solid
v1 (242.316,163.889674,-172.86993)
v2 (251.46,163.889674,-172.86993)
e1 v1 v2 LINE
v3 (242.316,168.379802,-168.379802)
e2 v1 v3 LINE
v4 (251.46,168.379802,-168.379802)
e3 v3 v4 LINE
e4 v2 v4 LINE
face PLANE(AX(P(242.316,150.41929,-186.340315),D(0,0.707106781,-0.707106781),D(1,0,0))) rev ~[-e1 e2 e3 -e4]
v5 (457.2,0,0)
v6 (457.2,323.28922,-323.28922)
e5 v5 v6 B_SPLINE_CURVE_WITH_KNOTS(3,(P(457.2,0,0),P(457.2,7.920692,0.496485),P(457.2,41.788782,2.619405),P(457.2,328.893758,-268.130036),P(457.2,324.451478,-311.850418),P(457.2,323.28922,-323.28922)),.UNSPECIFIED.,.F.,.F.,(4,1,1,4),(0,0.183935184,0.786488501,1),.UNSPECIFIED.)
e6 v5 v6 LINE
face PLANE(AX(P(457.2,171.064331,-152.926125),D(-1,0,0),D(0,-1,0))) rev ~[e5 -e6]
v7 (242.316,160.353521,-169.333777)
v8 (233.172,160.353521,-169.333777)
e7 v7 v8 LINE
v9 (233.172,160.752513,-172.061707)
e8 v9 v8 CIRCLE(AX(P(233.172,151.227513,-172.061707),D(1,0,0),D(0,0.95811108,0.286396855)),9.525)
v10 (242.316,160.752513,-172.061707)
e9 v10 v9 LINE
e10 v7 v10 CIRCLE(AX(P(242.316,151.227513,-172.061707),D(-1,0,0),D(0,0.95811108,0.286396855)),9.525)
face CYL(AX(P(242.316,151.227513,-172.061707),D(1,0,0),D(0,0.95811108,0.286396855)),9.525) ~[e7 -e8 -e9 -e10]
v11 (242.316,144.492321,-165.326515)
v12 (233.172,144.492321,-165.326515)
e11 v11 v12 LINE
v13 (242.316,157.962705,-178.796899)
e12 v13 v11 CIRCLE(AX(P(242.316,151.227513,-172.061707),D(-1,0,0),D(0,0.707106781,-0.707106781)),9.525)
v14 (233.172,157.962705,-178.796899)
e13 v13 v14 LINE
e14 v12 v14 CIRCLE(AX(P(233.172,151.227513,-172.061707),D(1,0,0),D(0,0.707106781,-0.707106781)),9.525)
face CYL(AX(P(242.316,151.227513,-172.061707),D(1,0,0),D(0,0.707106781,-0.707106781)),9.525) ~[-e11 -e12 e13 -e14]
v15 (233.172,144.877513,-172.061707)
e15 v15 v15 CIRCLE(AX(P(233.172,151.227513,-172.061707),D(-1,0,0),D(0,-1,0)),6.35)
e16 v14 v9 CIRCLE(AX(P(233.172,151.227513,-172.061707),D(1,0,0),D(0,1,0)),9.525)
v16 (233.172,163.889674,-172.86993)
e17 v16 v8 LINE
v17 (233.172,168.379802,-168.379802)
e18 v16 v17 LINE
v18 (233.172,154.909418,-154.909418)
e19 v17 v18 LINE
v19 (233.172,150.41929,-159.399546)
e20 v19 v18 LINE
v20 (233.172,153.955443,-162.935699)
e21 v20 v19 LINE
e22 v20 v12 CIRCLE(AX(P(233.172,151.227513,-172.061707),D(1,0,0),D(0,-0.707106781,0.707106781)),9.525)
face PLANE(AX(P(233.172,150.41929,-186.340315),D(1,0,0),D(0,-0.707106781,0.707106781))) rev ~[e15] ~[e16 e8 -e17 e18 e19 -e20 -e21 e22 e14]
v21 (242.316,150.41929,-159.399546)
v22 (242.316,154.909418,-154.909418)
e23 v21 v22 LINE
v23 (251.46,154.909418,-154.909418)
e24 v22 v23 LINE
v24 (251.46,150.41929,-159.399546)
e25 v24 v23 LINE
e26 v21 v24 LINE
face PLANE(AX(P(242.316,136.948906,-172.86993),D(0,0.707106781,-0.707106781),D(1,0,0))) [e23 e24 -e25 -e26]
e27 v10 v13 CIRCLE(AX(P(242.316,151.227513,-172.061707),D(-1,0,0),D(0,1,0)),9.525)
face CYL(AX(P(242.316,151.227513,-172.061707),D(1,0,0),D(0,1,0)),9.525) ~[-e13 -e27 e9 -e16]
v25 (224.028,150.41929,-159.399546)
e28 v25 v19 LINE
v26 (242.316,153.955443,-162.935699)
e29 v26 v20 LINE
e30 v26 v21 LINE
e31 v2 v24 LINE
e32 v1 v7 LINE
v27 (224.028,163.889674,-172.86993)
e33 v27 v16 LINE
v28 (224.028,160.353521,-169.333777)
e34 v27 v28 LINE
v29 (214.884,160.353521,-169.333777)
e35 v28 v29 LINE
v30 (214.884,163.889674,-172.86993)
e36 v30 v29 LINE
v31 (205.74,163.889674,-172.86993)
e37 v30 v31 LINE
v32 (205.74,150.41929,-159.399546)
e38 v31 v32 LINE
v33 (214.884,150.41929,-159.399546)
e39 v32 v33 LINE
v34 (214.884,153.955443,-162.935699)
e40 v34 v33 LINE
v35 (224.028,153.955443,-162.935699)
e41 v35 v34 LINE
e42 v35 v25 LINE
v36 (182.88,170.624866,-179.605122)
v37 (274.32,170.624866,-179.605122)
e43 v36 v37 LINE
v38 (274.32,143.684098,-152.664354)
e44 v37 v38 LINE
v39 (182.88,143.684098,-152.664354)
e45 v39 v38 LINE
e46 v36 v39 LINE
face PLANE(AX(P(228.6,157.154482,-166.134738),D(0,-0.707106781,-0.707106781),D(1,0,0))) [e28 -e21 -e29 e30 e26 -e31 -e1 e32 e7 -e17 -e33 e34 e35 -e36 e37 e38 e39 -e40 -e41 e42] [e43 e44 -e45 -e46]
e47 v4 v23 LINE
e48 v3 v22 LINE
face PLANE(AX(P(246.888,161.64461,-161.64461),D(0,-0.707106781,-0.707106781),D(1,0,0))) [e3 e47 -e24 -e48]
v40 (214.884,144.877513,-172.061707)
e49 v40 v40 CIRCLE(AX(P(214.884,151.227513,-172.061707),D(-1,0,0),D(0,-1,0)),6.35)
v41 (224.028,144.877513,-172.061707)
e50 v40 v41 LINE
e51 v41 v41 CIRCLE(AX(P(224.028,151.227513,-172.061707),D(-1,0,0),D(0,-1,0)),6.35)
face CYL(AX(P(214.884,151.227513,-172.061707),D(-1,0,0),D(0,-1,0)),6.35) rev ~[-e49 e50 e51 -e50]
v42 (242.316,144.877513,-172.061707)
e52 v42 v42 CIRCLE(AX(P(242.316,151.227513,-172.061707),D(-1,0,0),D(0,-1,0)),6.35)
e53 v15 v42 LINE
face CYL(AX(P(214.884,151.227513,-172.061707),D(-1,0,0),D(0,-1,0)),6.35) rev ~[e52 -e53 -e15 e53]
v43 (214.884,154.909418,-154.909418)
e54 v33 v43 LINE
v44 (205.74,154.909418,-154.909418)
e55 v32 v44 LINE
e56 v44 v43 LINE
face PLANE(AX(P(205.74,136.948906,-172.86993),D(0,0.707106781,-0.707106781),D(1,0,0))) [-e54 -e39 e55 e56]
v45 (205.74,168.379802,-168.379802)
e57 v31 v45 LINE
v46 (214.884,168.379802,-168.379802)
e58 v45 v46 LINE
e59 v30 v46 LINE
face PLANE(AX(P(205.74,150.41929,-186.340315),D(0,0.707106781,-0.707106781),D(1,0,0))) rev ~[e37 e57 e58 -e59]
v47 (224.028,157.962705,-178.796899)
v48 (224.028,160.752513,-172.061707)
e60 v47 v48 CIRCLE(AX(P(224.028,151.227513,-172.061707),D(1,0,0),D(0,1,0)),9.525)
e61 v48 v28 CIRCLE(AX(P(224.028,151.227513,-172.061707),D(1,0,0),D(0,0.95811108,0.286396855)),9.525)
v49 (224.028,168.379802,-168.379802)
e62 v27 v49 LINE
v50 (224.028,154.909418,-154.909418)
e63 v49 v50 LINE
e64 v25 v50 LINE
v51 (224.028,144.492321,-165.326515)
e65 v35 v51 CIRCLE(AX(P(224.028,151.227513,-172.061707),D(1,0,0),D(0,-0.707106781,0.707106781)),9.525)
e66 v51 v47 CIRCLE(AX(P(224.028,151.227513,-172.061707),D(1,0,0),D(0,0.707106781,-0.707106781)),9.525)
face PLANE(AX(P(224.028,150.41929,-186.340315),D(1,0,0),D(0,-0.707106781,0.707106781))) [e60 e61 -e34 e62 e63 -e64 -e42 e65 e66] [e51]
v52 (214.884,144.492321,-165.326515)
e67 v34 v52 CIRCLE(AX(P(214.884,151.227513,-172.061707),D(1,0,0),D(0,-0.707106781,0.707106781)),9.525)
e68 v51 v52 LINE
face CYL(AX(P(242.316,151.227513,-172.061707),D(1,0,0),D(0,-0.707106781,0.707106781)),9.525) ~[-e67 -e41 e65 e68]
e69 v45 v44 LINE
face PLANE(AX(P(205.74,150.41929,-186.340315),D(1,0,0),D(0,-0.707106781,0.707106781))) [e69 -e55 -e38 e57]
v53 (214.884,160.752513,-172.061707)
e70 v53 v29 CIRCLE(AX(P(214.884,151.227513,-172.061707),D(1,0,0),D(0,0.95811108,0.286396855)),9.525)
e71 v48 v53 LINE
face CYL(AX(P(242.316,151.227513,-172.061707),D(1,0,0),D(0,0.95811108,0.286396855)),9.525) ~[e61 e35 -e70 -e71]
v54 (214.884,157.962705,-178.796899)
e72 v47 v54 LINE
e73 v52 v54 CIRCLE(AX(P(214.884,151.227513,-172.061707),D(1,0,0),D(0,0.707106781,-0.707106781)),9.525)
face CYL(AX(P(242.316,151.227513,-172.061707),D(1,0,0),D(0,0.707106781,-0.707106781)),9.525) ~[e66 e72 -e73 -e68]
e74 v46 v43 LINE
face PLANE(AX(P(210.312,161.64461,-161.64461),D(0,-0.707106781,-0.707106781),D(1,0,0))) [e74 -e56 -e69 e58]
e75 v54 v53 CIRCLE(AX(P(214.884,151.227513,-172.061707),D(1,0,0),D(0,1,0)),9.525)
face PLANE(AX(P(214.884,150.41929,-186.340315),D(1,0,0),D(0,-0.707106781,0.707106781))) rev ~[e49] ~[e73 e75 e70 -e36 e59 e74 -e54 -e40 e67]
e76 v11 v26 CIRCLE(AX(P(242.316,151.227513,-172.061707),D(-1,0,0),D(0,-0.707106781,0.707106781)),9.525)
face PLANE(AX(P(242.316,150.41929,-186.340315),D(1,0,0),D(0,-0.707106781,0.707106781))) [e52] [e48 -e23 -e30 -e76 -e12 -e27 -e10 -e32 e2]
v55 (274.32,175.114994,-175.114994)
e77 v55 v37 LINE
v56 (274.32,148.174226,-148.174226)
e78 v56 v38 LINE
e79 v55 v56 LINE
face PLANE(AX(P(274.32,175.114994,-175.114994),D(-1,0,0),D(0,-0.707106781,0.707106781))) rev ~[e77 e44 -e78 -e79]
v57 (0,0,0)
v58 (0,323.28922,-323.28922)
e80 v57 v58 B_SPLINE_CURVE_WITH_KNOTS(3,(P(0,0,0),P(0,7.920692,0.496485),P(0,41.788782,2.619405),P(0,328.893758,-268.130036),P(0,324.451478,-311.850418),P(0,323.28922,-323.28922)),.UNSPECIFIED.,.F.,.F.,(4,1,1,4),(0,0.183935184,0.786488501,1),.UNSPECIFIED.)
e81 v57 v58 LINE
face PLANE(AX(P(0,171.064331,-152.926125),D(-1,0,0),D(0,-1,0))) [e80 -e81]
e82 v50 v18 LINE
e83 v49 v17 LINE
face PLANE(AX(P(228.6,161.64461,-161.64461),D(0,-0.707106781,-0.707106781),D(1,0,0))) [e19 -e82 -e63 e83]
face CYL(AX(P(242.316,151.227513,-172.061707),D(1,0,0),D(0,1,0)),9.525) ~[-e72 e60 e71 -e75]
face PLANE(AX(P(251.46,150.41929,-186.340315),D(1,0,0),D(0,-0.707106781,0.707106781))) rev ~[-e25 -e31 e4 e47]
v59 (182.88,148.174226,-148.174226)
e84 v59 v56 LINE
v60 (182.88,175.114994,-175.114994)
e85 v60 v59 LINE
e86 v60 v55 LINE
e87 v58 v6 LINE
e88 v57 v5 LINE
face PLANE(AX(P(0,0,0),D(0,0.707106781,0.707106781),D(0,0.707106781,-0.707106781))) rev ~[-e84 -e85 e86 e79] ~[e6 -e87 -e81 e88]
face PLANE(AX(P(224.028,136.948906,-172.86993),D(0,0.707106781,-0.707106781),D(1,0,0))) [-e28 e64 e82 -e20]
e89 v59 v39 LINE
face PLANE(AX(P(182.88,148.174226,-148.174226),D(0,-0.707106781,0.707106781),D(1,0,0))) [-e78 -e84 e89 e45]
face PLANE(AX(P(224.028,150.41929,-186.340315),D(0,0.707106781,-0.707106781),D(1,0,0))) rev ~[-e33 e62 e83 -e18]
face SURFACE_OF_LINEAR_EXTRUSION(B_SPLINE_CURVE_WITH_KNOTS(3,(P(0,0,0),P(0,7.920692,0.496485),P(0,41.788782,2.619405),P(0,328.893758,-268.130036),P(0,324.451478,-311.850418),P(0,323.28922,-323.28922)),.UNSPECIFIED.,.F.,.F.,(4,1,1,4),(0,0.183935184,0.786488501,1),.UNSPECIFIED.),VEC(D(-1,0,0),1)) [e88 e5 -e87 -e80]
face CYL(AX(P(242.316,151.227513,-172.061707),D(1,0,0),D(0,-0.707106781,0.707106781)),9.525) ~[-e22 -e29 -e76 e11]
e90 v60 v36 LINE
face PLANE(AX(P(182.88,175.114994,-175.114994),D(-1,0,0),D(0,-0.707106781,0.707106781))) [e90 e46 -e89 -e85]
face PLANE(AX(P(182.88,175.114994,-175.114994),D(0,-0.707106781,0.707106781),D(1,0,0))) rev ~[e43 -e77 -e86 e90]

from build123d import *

# Parameters (mm, degrees)
F1_DEPTH  = 457.2
F2_W      = 91.44
F2_H      = 38.1
F3_DEPTH  = 6.35
F4_W      = 45.72
F4_H      = 19.05
F5_DEPTH  = 19.05
F6_W      = 9.144
F6_H      = 19.05
F7_DEPTH  = 25.4
F9_DEPTH  = 27.94
F10_R     = 6.35
F11_DEPTH = 50.8


with BuildPart() as f1:
    # F0 (on Right) → F1 (new body)
    with BuildSketch(Plane.YZ):
        with BuildLine():
            add(Edge.make_bspline(
                [(0, 0), (7.9206921486, 0.4964849945), (41.788781698, 2.6194053072), (328.8937583875, -268.1300359687), (324.4514783657, -311.8504178384), (323.2892203585, -323.2892203585)],
                knots=[0, 0, 0, 0, 0.1839351844, 0.786488501, 1, 1, 1, 1], degree=3))
            Line((0, 0), (323.2892203585, -323.2892203585))
        make_face()
    extrude(amount=F1_DEPTH)

    # F2 (on face) → F3 (join)
    with BuildSketch(Plane(origin=(0, 0, 0), x_dir=(1, 0, 0), z_dir=(0, -0.7071067812, -0.7071067812))):
        with Locations((228.6, -228.6)):
            Rectangle(F2_W, F2_H)
    extrude(amount=F3_DEPTH)

    # F4 (on face) → F5 (join)
    with BuildSketch(Plane(origin=(0, -4.4901280605, -4.4901280605), x_dir=(1, 0, 0), z_dir=(0, -0.7071067812, -0.7071067812))):
        with Locations((228.6, -228.6)):
            Rectangle(F4_W, F4_H)
    extrude(amount=F5_DEPTH)

    # F6 (on face) → F7 (cut)
    with BuildSketch(Plane(origin=(0, -17.9605122421, -17.9605122421), x_dir=(1, 0, 0), z_dir=(0, -0.7071067812, -0.7071067812))):
        with Locations((210.312, -228.6)):
            Rectangle(F6_W, F6_H)
        with Locations((228.6, -228.6)):
            Rectangle(F6_W, F6_H)
        with Locations((246.888, -228.6)):
            Rectangle(F6_W, F6_H)
    extrude(amount=-F7_DEPTH, mode=Mode.SUBTRACT)

    # F8 (on face) → F9 (cut)
    with BuildSketch(Plane.YZ.offset(242.316)):
        with BuildLine():
            ThreePointArc((144.492320988, -165.3265151889), (148.8943740988, -162.8268771513), (153.9554431224, -162.9356992435))
            Line((153.9554431224, -162.9356992435), (150.4192900279, -159.399546149))
            Line((150.4192900279, -159.399546149), (144.492320988, -165.3265151889))
        make_face()
        with BuildLine():
            ThreePointArc((160.353521115, -169.3337772361), (160.6522372537, -170.683230139), (160.7525130788, -172.0617072797))
            ThreePointArc((160.7525130788, -172.0617072797), (160.027465626, -175.706766973), (157.9627051696, -178.7968993705))
            Line((157.9627051696, -178.7968993705), (163.8896742095, -172.8699303306))
            Line((163.8896742095, -172.8699303306), (160.353521115, -169.3337772361))
        make_face()
        with BuildLine():
            Line((150.4192900279, -186.3403145122), (157.9627051696, -178.7968993705))
            ThreePointArc((157.9627051696, -178.7968993705), (144.492320988, -178.7968993705), (144.492320988, -165.3265151889))
            Line((144.492320988, -165.3265151889), (136.9489058463, -172.8699303306))
            Line((136.9489058463, -172.8699303306), (150.4192900279, -186.3403145122))
        make_face()
    extrude(amount=-F9_DEPTH, mode=Mode.SUBTRACT)

    # F10 (on face) → F11 (cut)
    with BuildSketch(Plane(origin=(214.884, 0, 0), x_dir=(0, -1, 0), z_dir=(-1, 0, 0))):
        with Locations((-151.2275130788, -172.0617072797)):
            Circle(F10_R)
    extrude(amount=-F11_DEPTH, mode=Mode.SUBTRACT)


solid = f1.part
